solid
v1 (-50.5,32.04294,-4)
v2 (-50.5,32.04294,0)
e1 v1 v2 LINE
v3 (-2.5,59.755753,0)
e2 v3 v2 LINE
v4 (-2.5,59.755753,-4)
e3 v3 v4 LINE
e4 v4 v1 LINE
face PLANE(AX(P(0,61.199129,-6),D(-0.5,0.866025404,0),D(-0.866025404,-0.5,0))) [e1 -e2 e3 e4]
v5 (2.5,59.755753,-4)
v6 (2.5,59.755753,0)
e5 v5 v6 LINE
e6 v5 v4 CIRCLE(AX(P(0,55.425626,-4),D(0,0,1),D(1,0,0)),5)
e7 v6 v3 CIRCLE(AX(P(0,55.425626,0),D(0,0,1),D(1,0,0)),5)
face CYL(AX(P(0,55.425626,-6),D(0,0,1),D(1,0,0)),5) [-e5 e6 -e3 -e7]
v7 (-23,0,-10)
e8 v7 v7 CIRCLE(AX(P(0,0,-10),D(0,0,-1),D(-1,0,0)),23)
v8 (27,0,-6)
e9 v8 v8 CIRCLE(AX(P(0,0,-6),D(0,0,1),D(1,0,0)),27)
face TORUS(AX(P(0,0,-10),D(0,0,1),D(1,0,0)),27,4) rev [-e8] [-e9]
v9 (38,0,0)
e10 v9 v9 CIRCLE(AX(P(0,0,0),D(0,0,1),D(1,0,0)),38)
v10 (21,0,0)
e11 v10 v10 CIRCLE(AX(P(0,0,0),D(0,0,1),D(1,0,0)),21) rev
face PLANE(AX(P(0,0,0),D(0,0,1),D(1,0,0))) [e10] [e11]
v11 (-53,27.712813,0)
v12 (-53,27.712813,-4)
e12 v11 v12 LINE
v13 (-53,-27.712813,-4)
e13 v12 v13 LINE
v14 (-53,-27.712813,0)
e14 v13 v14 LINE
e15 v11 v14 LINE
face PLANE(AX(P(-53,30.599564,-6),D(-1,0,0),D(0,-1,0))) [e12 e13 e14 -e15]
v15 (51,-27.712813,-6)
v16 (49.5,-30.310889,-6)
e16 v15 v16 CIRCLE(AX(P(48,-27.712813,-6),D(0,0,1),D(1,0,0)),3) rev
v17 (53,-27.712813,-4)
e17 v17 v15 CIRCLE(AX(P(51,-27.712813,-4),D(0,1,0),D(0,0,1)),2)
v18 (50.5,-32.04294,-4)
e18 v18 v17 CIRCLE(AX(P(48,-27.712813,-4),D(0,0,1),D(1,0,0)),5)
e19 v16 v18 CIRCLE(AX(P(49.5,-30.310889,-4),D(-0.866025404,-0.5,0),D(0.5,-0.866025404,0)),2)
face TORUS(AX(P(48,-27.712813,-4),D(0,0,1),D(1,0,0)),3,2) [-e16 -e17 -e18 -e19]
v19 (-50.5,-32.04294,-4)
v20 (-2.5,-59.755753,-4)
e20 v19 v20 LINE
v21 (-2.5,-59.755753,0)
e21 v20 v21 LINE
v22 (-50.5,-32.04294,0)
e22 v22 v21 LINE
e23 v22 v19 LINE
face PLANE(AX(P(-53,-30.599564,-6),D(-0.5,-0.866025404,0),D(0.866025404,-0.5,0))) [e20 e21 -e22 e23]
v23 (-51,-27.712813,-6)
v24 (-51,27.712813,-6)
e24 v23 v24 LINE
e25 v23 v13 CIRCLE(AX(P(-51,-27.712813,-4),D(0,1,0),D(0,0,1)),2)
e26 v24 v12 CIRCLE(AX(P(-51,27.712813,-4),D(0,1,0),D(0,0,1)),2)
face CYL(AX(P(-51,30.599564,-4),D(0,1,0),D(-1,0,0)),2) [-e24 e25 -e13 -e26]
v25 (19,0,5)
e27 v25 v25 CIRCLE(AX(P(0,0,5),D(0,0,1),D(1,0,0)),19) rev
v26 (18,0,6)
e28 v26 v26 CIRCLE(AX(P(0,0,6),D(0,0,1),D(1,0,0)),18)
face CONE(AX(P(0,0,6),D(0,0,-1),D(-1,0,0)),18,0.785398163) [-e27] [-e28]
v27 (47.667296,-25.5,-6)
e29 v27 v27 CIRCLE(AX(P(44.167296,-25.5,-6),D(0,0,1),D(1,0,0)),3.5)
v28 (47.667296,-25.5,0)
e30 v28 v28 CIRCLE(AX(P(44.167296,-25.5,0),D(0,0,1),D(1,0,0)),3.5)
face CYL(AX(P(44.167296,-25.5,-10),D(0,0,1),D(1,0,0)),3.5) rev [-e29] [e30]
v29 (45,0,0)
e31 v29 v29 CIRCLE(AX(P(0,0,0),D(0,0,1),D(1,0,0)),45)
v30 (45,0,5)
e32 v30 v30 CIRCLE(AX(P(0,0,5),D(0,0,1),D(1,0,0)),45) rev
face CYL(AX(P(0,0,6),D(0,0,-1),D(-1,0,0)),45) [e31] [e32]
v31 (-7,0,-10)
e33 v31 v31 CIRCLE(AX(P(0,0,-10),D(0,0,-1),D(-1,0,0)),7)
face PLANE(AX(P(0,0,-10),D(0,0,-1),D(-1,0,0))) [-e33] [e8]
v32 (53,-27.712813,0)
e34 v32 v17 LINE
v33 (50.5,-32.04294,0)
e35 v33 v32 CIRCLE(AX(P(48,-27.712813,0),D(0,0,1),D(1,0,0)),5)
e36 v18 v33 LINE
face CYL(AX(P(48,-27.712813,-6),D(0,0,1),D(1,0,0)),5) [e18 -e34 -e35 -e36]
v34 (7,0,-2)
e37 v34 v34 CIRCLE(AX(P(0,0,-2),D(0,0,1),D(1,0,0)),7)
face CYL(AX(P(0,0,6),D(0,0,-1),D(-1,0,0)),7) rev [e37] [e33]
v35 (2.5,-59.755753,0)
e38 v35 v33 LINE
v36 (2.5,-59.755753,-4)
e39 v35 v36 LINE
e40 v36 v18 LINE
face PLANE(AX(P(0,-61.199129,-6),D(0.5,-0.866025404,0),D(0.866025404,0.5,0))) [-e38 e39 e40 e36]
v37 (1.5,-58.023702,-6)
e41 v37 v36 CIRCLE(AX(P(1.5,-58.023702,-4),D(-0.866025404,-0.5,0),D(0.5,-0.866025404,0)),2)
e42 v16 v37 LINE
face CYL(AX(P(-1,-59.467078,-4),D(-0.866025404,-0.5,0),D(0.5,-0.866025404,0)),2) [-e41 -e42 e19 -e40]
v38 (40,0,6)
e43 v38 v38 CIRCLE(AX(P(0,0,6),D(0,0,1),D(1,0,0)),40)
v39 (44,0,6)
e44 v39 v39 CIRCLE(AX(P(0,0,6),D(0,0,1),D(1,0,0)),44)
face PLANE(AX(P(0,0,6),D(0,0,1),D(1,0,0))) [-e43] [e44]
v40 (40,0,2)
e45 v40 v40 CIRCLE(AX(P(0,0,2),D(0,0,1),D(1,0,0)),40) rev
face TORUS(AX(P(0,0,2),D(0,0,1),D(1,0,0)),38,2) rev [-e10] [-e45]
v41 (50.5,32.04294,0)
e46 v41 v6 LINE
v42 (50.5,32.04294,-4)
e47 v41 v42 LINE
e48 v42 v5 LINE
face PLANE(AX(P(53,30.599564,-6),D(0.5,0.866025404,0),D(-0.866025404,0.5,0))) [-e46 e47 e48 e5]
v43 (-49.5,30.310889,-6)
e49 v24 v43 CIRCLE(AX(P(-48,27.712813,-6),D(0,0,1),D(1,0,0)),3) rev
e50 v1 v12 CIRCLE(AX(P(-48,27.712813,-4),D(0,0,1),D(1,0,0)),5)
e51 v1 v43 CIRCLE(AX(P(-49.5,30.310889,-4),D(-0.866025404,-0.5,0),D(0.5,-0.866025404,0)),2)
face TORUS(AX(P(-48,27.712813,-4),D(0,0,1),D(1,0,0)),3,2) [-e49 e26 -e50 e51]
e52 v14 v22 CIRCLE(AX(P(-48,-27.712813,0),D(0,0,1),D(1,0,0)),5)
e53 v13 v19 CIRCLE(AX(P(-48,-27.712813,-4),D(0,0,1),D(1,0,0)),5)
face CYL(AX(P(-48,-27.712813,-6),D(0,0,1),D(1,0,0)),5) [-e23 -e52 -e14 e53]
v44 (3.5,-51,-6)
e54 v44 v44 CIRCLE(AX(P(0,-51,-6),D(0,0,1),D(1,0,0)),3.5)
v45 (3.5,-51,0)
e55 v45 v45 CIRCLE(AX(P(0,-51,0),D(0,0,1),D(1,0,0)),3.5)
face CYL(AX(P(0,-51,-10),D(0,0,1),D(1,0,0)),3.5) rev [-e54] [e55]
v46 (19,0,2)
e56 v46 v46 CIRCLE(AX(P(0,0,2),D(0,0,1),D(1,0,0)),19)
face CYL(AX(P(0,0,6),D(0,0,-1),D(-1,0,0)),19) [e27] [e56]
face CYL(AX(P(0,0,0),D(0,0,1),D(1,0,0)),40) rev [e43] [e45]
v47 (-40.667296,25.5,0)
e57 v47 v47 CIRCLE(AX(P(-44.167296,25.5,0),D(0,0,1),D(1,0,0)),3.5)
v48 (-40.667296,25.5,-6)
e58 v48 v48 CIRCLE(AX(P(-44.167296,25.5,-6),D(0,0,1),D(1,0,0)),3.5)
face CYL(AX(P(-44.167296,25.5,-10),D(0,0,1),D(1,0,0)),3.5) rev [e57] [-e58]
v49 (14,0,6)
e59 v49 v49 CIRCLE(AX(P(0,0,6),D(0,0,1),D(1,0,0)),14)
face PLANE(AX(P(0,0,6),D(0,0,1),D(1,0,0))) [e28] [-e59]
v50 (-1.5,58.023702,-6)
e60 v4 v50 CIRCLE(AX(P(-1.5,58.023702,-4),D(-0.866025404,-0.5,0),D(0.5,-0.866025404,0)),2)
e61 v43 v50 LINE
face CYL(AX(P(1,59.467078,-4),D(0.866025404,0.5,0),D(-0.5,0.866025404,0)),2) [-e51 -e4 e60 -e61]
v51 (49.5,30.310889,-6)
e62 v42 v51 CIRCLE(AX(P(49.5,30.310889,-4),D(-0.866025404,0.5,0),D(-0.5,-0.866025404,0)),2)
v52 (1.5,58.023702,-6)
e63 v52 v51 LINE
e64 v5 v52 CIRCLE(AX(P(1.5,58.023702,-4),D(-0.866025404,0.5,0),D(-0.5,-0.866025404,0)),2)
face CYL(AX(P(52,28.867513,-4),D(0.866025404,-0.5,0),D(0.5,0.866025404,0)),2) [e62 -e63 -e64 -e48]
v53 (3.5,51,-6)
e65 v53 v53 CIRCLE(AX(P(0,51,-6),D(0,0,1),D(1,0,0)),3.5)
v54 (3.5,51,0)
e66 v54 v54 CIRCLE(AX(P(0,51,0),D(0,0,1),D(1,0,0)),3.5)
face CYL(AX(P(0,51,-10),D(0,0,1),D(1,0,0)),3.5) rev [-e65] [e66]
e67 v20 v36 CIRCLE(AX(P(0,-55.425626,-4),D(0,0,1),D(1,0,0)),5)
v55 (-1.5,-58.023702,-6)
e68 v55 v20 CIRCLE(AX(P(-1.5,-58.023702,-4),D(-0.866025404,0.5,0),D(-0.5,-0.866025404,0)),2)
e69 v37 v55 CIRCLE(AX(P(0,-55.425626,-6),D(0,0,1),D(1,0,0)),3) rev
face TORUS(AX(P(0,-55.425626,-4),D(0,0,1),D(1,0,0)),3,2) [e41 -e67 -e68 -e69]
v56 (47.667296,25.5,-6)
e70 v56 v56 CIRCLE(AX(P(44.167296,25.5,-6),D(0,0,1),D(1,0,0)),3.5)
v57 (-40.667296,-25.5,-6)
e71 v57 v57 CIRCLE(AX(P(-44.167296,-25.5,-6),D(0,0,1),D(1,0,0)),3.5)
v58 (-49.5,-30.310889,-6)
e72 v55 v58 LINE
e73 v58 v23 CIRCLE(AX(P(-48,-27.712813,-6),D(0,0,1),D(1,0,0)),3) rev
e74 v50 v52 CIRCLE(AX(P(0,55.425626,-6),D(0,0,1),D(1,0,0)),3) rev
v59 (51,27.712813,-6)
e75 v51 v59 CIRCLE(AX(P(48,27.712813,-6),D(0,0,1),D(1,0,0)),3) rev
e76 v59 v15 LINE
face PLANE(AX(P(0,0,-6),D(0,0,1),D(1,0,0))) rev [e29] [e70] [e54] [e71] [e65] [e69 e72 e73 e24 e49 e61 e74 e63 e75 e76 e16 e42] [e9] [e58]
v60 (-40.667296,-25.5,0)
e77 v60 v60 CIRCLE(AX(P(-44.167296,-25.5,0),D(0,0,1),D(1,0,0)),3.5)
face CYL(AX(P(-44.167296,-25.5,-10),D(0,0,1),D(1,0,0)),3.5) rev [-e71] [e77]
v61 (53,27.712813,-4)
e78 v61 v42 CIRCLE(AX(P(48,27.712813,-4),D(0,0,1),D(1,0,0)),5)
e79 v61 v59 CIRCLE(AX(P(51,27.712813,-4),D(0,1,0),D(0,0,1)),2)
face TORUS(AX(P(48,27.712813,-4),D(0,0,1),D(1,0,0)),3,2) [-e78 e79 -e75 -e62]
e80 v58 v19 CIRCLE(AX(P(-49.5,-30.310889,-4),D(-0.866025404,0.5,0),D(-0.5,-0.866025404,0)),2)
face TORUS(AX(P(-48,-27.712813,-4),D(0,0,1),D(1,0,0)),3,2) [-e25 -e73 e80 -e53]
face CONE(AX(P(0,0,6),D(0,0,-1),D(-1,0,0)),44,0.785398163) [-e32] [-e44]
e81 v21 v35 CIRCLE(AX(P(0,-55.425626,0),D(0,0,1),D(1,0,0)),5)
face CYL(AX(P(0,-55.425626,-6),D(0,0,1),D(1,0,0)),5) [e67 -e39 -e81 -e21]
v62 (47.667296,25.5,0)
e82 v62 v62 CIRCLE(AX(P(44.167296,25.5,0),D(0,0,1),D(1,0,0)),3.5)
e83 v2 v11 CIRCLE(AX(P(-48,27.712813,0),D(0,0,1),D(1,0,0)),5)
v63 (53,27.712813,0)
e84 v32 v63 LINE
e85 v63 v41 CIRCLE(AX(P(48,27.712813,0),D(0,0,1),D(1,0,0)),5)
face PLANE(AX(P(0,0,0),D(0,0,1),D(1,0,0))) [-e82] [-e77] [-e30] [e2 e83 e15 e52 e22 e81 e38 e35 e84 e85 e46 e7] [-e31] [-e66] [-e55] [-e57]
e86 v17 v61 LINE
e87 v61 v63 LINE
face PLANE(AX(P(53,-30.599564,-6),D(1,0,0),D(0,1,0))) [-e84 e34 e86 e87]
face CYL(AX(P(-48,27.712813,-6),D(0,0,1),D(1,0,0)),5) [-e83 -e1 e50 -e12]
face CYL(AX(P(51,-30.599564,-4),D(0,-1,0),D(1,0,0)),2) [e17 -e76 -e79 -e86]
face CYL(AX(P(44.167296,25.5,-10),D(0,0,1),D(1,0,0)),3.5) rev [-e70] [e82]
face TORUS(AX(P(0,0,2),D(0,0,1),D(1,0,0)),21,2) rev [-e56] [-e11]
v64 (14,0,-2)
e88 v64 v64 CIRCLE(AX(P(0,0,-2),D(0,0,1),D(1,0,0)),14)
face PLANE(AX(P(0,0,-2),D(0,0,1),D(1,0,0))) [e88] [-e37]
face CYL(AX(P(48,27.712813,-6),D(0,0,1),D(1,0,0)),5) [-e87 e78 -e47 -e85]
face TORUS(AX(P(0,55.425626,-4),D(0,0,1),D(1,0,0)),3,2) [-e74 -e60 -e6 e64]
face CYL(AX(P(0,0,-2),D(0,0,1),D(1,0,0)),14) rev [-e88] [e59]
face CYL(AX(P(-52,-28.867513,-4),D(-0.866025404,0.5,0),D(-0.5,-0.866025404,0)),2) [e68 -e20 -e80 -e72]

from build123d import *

# Parameters (mm, degrees)
BOSS_EXTRUDE1_DEPTH     = 6
SKETCH2_R               = 23
BOSS_EXTRUDE2_DEPTH     = 4
SKETCH4_R               = 45
BOSS_EXTRUDE3_DEPTH     = 6
SKETCH5_R               = 40
CUT_EXTRUDE1_DEPTH      = 6
SKETCH6_R               = 19
BOSS_EXTRUDE4_DEPTH     = 6
SKETCH7_R               = 14
CUT_EXTRUDE2_DEPTH      = 8
SKETCH8_R               = 7
CUT_EXTRUDE3_DEPTH      = 83.524743764
CUT_EXTRUDE4_DEPTH      = 82.574097196
CUT_EXTRUDE4_DEPTH_BACK = 82.574097196
SKETCH9_R               = 3.5
FILLET1_R               = 5
FILLET2_R               = 4
FILLET3_R               = 2
CHAMFER1_SIZE           = 1


with BuildPart() as part:
    # Sketch1 → Boss-Extrude1 (new body)
    with BuildSketch(Plane.XY):
        Polygon((0, 61.199128534), (-53, 30.599564267), (-53, -30.599564267), (0, -61.199128534), (53, -30.599564267), (53, 30.599564267), align=None)
    extrude(amount=-BOSS_EXTRUDE1_DEPTH)

    # Sketch2 → Boss-Extrude2 (add)
    with BuildSketch(Plane(origin=(0, 0, -6), x_dir=(-1, 0, 0), z_dir=(0, 0, -1))):
        Circle(SKETCH2_R)
    extrude(amount=BOSS_EXTRUDE2_DEPTH)

    # Sketch4 → Boss-Extrude3 (add)
    with BuildSketch(Plane.XY):
        Circle(SKETCH4_R)
    extrude(amount=BOSS_EXTRUDE3_DEPTH)

    # Sketch5 → Cut-Extrude1 (cut)
    with BuildSketch(Plane.XY.offset(6)):
        Circle(SKETCH5_R)
    extrude(amount=-CUT_EXTRUDE1_DEPTH, mode=Mode.SUBTRACT)

    # Sketch6 → Boss-Extrude4 (add)
    with BuildSketch(Plane.XY):
        Circle(SKETCH6_R)
    extrude(amount=BOSS_EXTRUDE4_DEPTH)

    # Sketch7 → Cut-Extrude2 (cut)
    with BuildSketch(Plane.XY.offset(6)):
        Circle(SKETCH7_R)
    extrude(amount=-CUT_EXTRUDE2_DEPTH, mode=Mode.SUBTRACT)

    # Sketch8 → Cut-Extrude3 (cut, through all)
    with BuildSketch(Plane(origin=(0, 0, -10), x_dir=(-1, 0, 0), z_dir=(0, 0, -1))):
        Circle(SKETCH8_R)
    extrude(amount=-CUT_EXTRUDE3_DEPTH, mode=Mode.SUBTRACT)

    # Sketch9 → Cut-Extrude4 (cut, two sides: drawn at the far end of the back side and taken through both)
    with BuildSketch(Plane.XY.offset(-CUT_EXTRUDE4_DEPTH_BACK)):
        with Locations((0, 51)):
            Circle(SKETCH9_R)
        with Locations((44.167295593, 25.5)):
            Circle(SKETCH9_R)
        with Locations((44.167295593, -25.5)):
            Circle(SKETCH9_R)
        with Locations((0, -51)):
            Circle(SKETCH9_R)
        with Locations((-44.167295593, -25.5)):
            Circle(SKETCH9_R)
        with Locations((-44.167295593, 25.5)):
            Circle(SKETCH9_R)
    extrude(amount=CUT_EXTRUDE4_DEPTH + CUT_EXTRUDE4_DEPTH_BACK, mode=Mode.SUBTRACT)

    # Fillet1
    fillet1_edges = [part.edges().sort_by_distance(p)[0] for p in [
        (53, 30.599564267, -3),
        (53, -30.599564267, -3),
        (0, -61.199128534, -3),
        (-53, -30.599564267, -3),
        (-53, 30.599564267, -3),
        (0, 61.199128534, -3),
    ]]
    fillet(fillet1_edges, radius=FILLET1_R)

    # Fillet2
    fillet2_edges = [part.edges().sort_by_distance(p)[0] for p in [
        (23, 0, -6),
    ]]
    fillet(fillet2_edges, radius=FILLET2_R - 0.0001)  # a hair under: the kernel refuses the full size

    # Fillet3
    fillet3_edges = [part.edges().sort_by_distance(p)[0] for p in [
        (-40, 0, 0),
        (-19, 0, 0),
        (26.5, 45.899346401, -6),
        (-26.5, 45.899346401, -6),
        (53, 0, -6),
        (26.5, -45.899346401, -6),
        (-26.5, -45.899346401, -6),
        (-53, 0, -6),
        (-52.330127019, 30.212812921, -6),
        (52.330127019, 30.212812921, -6),
        (52.330127019, -30.212812921, -6),
        (0, -60.425625842, -6),
        (-52.330127019, -30.212812921, -6),
        (0, 60.425625842, -6),
    ]]
    fillet(fillet3_edges, radius=FILLET3_R)

    # Chamfer1
    chamfer1_edges = [part.edges().sort_by_distance(p)[0] for p in [
        (-45, 0, 6),
        (-19, 0, 6),
    ]]
    chamfer(chamfer1_edges, length=CHAMFER1_SIZE)


solid = part.part
